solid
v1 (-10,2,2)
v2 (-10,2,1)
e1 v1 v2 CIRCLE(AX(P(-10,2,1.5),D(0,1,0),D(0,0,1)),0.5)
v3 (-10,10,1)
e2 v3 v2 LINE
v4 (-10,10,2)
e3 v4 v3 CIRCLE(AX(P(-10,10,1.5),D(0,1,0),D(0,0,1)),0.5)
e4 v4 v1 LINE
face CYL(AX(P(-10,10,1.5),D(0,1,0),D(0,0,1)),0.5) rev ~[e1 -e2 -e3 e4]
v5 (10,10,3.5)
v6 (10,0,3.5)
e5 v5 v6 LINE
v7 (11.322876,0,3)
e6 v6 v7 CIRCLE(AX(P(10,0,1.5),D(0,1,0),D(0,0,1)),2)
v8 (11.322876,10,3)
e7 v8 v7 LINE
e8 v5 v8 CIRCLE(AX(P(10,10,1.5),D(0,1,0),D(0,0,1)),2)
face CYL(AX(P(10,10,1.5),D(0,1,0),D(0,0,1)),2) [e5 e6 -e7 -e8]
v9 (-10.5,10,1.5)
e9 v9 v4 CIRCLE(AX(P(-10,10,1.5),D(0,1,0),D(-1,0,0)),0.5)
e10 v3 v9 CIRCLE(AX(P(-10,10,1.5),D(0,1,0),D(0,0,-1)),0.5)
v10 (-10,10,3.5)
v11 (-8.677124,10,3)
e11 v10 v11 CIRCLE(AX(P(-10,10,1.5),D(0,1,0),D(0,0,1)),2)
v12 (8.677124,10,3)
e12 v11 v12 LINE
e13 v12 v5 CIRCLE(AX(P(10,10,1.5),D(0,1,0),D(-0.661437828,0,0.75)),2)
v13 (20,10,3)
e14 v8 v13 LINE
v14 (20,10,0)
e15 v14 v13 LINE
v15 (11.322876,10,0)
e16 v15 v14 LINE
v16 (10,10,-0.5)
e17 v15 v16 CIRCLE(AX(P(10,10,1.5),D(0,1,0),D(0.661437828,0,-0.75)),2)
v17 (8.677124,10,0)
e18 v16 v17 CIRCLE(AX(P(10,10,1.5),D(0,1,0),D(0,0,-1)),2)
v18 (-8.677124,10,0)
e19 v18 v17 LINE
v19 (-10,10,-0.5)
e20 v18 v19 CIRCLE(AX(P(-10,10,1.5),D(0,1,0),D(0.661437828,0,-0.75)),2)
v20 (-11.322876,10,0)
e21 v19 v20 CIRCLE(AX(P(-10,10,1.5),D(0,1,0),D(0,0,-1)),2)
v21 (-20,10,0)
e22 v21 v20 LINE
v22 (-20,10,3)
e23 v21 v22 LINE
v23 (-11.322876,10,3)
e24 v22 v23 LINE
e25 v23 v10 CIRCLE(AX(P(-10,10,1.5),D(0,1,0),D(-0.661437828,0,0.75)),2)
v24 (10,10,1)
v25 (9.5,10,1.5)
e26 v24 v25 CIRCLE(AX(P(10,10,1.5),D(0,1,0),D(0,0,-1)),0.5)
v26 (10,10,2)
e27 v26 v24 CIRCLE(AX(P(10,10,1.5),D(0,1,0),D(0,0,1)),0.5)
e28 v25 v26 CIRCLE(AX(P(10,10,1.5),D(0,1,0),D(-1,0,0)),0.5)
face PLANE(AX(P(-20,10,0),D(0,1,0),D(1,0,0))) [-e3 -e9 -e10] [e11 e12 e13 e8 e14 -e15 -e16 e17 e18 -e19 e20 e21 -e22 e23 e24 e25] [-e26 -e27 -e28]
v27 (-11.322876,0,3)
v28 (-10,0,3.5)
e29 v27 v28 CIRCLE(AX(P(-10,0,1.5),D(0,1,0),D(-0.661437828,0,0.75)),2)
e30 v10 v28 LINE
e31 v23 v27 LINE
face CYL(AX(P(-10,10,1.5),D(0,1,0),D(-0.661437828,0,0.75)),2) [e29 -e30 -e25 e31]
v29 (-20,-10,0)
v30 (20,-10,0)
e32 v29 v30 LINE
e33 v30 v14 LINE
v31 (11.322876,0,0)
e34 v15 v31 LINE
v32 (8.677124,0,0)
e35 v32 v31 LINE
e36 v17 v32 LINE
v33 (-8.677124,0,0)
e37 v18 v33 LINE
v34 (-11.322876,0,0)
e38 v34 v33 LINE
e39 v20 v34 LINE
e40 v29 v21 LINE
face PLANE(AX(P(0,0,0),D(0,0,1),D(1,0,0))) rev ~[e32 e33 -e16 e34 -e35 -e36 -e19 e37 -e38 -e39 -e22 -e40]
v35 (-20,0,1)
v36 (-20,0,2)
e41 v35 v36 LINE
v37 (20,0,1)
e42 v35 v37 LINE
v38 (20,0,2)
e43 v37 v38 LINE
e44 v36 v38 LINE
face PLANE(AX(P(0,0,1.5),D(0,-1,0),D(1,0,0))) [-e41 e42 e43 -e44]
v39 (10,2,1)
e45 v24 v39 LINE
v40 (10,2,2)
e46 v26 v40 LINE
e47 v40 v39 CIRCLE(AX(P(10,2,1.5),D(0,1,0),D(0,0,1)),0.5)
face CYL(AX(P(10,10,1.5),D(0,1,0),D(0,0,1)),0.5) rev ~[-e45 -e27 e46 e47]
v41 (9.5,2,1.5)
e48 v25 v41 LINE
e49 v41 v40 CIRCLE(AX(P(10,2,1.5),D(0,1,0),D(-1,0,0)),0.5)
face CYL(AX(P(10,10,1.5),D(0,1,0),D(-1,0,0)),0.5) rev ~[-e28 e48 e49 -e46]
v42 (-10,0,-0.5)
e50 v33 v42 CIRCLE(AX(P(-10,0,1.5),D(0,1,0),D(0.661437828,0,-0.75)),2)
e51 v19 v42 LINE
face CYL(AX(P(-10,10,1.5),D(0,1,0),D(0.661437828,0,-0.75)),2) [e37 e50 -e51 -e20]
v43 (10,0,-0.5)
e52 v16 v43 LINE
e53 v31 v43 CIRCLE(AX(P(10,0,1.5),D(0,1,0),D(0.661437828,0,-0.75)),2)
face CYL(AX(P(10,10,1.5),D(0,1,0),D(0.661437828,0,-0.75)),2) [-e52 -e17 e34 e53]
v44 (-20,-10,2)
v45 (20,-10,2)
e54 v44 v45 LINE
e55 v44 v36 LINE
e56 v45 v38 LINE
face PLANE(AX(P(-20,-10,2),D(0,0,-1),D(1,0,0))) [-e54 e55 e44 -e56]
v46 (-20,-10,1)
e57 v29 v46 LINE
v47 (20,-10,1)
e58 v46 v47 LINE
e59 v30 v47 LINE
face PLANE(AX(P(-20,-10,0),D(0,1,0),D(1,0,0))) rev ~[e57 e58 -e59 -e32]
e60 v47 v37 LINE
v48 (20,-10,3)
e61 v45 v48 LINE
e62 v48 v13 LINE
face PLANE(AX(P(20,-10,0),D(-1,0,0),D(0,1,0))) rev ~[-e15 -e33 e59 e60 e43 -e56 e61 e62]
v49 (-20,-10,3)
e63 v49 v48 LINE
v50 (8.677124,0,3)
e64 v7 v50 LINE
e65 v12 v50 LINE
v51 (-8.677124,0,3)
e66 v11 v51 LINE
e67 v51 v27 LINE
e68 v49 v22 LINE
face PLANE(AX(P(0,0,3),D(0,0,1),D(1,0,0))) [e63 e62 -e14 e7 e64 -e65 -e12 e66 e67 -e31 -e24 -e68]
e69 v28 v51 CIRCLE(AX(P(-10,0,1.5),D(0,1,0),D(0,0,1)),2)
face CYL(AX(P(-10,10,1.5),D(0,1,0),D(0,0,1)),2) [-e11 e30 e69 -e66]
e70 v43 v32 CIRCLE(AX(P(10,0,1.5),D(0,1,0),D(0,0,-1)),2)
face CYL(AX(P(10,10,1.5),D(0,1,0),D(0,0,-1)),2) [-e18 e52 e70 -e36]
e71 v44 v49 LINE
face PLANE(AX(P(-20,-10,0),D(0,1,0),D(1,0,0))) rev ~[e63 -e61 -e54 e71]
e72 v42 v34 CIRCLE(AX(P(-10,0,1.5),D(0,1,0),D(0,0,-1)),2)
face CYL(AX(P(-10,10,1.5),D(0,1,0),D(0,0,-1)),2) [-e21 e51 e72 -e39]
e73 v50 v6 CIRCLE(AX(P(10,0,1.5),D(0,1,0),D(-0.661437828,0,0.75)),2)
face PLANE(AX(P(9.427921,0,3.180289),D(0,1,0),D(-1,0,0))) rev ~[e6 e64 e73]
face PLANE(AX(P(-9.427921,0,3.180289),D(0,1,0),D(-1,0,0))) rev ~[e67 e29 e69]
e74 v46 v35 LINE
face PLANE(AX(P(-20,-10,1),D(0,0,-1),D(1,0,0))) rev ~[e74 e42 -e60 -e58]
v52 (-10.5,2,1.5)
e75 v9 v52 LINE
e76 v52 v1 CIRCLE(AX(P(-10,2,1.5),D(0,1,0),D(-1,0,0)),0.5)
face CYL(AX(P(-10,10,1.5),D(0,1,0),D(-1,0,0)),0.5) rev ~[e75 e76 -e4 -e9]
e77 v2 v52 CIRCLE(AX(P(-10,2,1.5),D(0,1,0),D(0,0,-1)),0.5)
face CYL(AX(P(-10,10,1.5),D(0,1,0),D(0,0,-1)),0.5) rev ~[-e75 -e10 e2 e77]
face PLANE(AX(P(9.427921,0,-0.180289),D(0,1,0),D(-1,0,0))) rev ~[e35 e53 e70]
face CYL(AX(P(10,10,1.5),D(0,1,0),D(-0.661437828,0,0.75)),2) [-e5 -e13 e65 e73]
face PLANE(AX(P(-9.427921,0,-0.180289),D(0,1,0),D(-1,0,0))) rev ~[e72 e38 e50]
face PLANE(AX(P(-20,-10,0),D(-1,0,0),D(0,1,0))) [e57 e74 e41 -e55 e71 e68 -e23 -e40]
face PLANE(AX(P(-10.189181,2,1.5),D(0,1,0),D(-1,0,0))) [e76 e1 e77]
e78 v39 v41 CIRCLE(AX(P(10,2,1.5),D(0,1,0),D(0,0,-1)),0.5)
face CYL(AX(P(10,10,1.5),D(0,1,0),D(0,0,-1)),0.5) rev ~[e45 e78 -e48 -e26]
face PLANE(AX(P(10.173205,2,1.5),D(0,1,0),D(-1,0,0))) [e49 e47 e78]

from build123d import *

# Parameters (mm, degrees)
F0_W     = 40
F0_H     = 20
F1_DEPTH = 3
F2_W     = 40
F2_H     = 1
F3_DEPTH = 10
F5_DEPTH = 10
F6_DEPTH = 8


with BuildPart() as f1:
    # F0 (on Top) → F1 (new body)
    with BuildSketch(Plane.XY):
        Rectangle(F0_W, F0_H)
    extrude(amount=F1_DEPTH)

    # F2 (on face) → F3 (cut)
    with BuildSketch(Plane.XZ.offset(10)):
        with Locations((0, 1.5)):
            Rectangle(F2_W, F2_H)
    extrude(amount=-F3_DEPTH, mode=Mode.SUBTRACT)

    # F4 (on face) → F5 (join)
    with BuildSketch(Plane(origin=(0, 10, 0), x_dir=(-1, 0, 0), z_dir=(0, 1, 0))):
        with BuildLine():
            ThreePointArc((10, 3.5), (9.2928932188, 3.3708286934), (8.6771243445, 3))
            Line((8.6771243445, 3), (10, 3))
            Line((10, 3), (10, 3.5))
        make_face()
        with BuildLine():
            Line((-10, 3), (-8.6771243445, 3))
            ThreePointArc((-8.6771243445, 3), (-9.2928932188, 3.3708286934), (-10, 3.5))
            Line((-10, 3.5), (-10, 3))
        make_face()
        with BuildLine():
            ThreePointArc((11.3228756555, 3), (10.7071067812, 3.3708286934), (10, 3.5))
            Line((10, 3.5), (10, 3))
            Line((10, 3), (11.3228756555, 3))
        make_face()
        with BuildLine():
            Line((-10, 3), (-10, 3.5))
            ThreePointArc((-10, 3.5), (-10.7071067812, 3.3708286934), (-11.3228756555, 3))
            Line((-11.3228756555, 3), (-10, 3))
        make_face()
        with BuildLine():
            ThreePointArc((-10, -0.5), (-9.2928932188, -0.3708286934), (-8.6771243445, 0))
            Line((-8.6771243445, 0), (-10, 0))
            Line((-10, 0), (-10, -0.5))
        make_face()
        with BuildLine():
            Line((10, 0), (8.6771243445, 0))
            ThreePointArc((8.6771243445, 0), (9.2928932188, -0.3708286934), (10, -0.5))
            Line((10, -0.5), (10, 0))
        make_face()
        with BuildLine():
            ThreePointArc((-11.3228756555, 0), (-10.7071067812, -0.3708286934), (-10, -0.5))
            Line((-10, -0.5), (-10, 0))
            Line((-10, 0), (-11.3228756555, 0))
        make_face()
        with BuildLine():
            Line((10, 0), (10, -0.5))
            ThreePointArc((10, -0.5), (10.7071067812, -0.3708286934), (11.3228756555, 0))
            Line((11.3228756555, 0), (10, 0))
        make_face()
    extrude(amount=-F5_DEPTH)

    # F4 (on face) → F6 (cut)
    with BuildSketch(Plane(origin=(0, 10, 0), x_dir=(-1, 0, 0), z_dir=(0, 1, 0))):
        with BuildLine():
            ThreePointArc((-10, 2), (-10.5, 1.5), (-10, 1))
            Line((-10, 1), (-10, 2))
        make_face()
        with BuildLine():
            Line((-10, 2), (-10, 1))
            ThreePointArc((-10, 1), (-9.6464466094, 1.1464466094), (-9.5, 1.5))
            ThreePointArc((-9.5, 1.5), (-9.6464466094, 1.8535533906), (-10, 2))
        make_face()
        with BuildLine():
            Line((10, 2), (10, 1))
            ThreePointArc((10, 1), (10.3535533906, 1.1464466094), (10.5, 1.5))
            ThreePointArc((10.5, 1.5), (10.3535533906, 1.8535533906), (10, 2))
        make_face()
        with BuildLine():
            ThreePointArc((10, 2), (9.5, 1.5), (10, 1))
            Line((10, 1), (10, 2))
        make_face()
    extrude(amount=-F6_DEPTH, mode=Mode.SUBTRACT)


solid = f1.part
